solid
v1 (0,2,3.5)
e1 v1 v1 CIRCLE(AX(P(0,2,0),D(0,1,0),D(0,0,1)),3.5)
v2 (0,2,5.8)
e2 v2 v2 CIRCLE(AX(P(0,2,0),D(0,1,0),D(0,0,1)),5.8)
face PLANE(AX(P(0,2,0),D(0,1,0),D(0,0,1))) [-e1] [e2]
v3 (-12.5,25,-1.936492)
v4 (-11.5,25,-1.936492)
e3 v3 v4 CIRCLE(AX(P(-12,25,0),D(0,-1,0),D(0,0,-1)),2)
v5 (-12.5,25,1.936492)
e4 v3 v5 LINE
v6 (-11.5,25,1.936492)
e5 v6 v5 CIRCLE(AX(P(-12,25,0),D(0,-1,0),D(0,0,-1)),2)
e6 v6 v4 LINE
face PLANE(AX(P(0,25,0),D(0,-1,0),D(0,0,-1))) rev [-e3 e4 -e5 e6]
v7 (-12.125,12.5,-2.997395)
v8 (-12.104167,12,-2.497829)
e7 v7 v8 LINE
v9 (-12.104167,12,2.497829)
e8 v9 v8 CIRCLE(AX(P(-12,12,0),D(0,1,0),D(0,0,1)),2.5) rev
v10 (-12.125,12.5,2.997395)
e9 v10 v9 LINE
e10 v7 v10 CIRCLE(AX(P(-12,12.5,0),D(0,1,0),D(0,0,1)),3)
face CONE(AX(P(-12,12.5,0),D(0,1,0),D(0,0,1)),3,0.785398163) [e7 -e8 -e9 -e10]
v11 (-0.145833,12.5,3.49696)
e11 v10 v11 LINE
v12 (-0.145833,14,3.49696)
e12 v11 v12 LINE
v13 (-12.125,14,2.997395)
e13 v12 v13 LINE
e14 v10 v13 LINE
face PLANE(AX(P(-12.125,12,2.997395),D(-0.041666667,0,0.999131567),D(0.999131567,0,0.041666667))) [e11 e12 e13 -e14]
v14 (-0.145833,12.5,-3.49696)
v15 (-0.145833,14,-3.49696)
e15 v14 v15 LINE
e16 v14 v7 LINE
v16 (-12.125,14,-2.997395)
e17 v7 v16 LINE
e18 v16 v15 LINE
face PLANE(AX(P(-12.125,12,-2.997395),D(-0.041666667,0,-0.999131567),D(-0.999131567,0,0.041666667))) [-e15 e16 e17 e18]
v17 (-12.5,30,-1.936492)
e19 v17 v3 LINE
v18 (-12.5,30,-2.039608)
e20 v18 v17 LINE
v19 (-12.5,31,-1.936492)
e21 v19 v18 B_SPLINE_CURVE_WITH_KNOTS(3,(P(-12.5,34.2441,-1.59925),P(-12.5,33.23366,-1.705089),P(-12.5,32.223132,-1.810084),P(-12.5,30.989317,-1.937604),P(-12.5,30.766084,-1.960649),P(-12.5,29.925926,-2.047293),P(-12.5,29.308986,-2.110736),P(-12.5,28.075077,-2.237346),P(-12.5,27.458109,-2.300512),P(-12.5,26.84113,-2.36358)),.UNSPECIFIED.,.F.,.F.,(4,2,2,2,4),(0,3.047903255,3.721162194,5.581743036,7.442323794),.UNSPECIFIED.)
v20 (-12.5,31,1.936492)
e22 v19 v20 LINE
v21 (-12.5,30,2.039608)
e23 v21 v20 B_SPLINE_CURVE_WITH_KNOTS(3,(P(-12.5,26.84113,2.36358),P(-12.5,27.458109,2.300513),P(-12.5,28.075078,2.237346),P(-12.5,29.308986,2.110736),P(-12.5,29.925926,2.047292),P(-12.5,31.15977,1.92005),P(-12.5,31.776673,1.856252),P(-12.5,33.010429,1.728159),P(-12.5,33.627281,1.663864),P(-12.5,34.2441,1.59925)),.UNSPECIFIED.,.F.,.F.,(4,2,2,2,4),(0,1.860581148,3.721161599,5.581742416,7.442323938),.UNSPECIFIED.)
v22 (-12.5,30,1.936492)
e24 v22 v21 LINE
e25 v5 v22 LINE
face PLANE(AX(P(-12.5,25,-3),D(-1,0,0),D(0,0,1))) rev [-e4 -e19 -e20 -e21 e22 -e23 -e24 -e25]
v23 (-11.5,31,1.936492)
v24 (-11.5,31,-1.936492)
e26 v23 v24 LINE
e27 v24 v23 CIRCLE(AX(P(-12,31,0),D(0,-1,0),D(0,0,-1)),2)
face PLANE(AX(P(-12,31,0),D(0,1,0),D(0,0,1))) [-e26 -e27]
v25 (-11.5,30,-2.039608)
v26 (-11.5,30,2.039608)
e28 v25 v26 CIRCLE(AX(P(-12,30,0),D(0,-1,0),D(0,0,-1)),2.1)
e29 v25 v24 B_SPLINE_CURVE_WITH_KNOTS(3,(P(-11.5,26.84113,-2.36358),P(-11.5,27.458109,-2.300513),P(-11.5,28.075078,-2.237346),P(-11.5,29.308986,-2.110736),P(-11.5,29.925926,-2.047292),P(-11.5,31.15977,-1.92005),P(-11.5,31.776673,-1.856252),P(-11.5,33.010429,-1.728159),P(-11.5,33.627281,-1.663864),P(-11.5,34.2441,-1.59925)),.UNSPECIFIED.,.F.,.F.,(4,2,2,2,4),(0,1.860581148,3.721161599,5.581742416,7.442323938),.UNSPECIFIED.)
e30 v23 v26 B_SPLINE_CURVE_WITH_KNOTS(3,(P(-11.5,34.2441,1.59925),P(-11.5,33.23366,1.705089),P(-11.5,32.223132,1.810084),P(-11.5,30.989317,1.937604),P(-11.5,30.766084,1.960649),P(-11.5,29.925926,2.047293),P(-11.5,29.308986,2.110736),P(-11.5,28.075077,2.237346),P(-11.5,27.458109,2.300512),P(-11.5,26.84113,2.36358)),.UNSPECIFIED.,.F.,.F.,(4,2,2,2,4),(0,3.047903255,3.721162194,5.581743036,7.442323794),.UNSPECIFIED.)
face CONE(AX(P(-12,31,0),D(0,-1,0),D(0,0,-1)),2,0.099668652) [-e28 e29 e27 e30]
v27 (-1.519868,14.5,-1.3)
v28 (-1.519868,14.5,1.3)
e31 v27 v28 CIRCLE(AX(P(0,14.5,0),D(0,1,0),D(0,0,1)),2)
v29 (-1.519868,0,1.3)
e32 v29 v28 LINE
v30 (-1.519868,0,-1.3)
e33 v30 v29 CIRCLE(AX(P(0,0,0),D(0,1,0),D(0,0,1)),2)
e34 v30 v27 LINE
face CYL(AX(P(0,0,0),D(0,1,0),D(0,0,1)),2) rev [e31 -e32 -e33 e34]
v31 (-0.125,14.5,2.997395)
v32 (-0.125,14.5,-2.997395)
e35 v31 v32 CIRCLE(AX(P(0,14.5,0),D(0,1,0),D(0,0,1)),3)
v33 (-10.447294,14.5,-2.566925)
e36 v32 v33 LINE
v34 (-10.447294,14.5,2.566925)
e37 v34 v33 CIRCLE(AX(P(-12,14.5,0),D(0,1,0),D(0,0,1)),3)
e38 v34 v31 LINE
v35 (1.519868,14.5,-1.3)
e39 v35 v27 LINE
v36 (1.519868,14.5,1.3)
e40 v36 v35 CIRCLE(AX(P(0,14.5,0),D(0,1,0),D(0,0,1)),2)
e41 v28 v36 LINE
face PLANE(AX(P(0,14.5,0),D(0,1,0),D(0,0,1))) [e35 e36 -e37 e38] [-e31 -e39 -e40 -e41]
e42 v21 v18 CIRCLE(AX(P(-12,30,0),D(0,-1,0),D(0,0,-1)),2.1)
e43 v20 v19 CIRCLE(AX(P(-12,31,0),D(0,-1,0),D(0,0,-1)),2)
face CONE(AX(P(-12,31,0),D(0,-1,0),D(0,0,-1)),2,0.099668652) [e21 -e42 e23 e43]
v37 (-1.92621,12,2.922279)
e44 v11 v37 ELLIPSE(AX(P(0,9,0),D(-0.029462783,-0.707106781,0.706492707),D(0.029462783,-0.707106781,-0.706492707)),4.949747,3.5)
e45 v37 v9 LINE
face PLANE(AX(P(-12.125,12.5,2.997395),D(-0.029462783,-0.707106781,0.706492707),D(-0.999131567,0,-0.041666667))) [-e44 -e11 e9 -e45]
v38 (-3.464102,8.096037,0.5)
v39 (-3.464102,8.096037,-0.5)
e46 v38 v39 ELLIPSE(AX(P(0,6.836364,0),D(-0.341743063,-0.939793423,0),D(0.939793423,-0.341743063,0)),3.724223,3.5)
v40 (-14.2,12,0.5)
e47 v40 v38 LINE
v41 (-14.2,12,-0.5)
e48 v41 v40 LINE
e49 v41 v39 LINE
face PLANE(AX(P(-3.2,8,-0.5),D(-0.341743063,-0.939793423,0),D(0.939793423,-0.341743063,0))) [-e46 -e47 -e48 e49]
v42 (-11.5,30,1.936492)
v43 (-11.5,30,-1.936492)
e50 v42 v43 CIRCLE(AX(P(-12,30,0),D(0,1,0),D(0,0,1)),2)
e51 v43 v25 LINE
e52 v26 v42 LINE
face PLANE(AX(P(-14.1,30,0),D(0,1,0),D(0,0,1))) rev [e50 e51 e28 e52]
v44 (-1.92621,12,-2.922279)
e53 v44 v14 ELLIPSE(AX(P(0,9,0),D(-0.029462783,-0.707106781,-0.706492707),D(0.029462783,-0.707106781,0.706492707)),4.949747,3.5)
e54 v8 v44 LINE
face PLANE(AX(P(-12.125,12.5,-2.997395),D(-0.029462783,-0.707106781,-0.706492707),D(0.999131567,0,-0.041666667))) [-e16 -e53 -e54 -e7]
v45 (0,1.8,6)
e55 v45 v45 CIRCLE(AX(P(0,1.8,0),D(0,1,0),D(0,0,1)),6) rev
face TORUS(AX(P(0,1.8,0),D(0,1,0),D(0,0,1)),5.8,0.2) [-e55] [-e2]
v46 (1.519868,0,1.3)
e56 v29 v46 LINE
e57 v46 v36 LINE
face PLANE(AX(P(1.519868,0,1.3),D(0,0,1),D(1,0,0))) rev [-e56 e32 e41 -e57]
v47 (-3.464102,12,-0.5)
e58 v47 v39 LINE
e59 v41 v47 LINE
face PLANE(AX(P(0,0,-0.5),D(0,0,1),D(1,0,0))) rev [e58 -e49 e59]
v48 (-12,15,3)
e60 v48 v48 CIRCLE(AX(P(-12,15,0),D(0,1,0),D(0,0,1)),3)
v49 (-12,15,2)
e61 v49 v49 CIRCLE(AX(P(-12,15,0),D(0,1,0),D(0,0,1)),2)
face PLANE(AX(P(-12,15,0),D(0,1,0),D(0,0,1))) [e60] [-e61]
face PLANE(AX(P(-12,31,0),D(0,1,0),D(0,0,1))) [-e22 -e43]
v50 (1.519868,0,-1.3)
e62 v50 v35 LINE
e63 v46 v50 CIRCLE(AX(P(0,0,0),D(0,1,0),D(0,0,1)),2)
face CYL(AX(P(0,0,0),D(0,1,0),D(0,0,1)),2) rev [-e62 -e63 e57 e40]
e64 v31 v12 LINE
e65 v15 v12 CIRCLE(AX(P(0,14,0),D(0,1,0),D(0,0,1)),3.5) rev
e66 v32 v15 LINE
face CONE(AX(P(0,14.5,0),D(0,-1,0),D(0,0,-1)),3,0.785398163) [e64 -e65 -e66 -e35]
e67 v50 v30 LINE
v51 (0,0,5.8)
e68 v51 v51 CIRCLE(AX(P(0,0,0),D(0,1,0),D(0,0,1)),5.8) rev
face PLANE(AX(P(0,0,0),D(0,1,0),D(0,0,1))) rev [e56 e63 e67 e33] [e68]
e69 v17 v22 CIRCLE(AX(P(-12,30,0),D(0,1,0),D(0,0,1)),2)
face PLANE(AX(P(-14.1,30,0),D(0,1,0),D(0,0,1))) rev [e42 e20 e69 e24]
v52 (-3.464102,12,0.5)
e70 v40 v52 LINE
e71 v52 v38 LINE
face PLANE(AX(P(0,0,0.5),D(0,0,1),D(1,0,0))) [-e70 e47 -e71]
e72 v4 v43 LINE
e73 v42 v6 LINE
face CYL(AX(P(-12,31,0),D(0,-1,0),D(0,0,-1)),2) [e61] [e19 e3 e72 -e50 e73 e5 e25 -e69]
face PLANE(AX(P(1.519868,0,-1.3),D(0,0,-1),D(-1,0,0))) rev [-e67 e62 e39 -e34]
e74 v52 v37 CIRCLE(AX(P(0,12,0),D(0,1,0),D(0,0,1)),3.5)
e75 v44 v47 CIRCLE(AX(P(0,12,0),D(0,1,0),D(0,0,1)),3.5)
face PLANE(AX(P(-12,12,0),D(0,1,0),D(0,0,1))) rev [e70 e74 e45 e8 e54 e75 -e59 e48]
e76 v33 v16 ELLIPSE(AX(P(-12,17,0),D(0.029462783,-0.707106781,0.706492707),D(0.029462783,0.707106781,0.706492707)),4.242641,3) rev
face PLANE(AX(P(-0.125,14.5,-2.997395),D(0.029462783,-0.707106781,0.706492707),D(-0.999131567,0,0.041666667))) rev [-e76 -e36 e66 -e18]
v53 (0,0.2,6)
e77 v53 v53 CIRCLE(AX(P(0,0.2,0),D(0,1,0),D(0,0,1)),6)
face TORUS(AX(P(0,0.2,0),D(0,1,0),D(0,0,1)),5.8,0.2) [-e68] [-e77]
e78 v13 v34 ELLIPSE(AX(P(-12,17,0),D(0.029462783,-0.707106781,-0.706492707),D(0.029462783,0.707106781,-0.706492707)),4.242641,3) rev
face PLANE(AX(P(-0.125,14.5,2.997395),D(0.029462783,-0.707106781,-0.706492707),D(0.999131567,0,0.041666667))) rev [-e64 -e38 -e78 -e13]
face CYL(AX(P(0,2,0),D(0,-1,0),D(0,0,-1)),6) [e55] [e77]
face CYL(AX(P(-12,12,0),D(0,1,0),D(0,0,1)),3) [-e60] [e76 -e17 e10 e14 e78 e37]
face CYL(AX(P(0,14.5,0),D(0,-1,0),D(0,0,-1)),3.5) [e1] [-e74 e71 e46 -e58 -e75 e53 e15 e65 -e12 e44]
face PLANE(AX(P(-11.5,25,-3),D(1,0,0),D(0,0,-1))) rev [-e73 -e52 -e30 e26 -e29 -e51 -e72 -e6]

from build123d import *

# Parameters (mm, degrees)
SKETCH_1_R           = 6
EXTRUDE_1_DEPTH      = 2
SKETCH_2_R           = 3.5
EXTRUDE_2_DEPTH      = 12.5
EXTRUDE_START        = -2.5
EXTRUDE_3_DEPTH      = 2.5
EXTRUDE_4_DEPTH      = 0.5
EXTRUDE_4_DEPTH_BACK = 0.5
SKETCH_5_R           = 3
EXTRUDE_5_DEPTH      = 0.5
SKETCH_6_R           = 2
EXTRUDE_6_DEPTH      = 16
SKETCH_8_W           = 1
SKETCH_8_H           = 6
CUT_EXTRUDE_1_DEPTH  = 6
CUT_EXTRUDE_2_DEPTH  = 24.092206478
FILLET_1_R           = 0.2
CHAMFER_1_SIZE       = 0.5


with BuildPart() as part:
    # 草图1 → 凸台-拉伸1 (new body)
    with BuildSketch(Plane(origin=(0, 0, 0), x_dir=(1, 0, 0), z_dir=(0, 1, 0))):
        with Locations(Location((0, 0, 0), (0, 0, 270))):
            Circle(SKETCH_1_R)
    extrude(amount=EXTRUDE_1_DEPTH)

    # 草图2 → 凸台-拉伸2 (add)
    with BuildSketch(Plane(origin=(0, 2, 0), x_dir=(1, 0, 0), z_dir=(0, 1, 0))):
        with Locations(Location((0, 0, 0), (0, 0, 270))):
            Circle(SKETCH_2_R)
    extrude(amount=EXTRUDE_2_DEPTH)

    # 草图3 → 凸台-拉伸3 (add)
    with BuildSketch(Plane(origin=(0, 14.5, 0), x_dir=(1, 0, 0), z_dir=(0, 1, 0)).offset(EXTRUDE_START)):
        with BuildLine():
            Line((-12.125, 2.997394702), (-0.145833333, 3.496960486))
            ThreePointArc((-0.145833333, 3.496960486), (3.5, 0), (-0.145833333, -3.496960486))
            Line((-0.145833333, -3.496960486), (-12.125, -2.997394702))
            ThreePointArc((-12.125, -2.997394702), (-15, 0), (-12.125, 2.997394702))
        make_face()
    extrude(amount=EXTRUDE_3_DEPTH)

    # 草图4 → 凸台-拉伸4 (add, two sides: drawn at the far end of the back side and taken through both)
    with BuildSketch(Plane.XY.offset(-EXTRUDE_4_DEPTH_BACK)):
        Polygon((-14.2, 12), (-3.2, 8), (-0.2, 6.909090909), (-0.2, 12), (-3.2, 12), align=None)
    extrude(amount=EXTRUDE_4_DEPTH + EXTRUDE_4_DEPTH_BACK)

    # 草图5 → 凸台-拉伸5 (add)
    with BuildSketch(Plane(origin=(0, 14.5, 0), x_dir=(1, 0, 0), z_dir=(0, 1, 0))):
        with Locations(Location((-12, 0, 0), (0, 0, 270))):
            Circle(SKETCH_5_R)
    extrude(amount=EXTRUDE_5_DEPTH)

    # 草图6 → 凸台-拉伸6 (add)
    with BuildSketch(Plane(origin=(0, 15, 0), x_dir=(1, 0, 0), z_dir=(0, 1, 0))):
        with Locations(Location((-12, 0, 0), (0, 0, 270))):
            Circle(SKETCH_6_R)
    extrude(amount=EXTRUDE_6_DEPTH)

    # 草图7 → 旋转1 (revolve)
    with BuildSketch(Plane.XY, mode=Mode.PRIVATE) as revolve_1_sk:
        Polygon((-12, 31), (-14, 31), (-14.1, 30), (-12, 30), align=None)
    revolve(revolve_1_sk.sketch.rotate(Axis((-12, 30, 0), (0, 1, 0)), 90), axis=Axis((-12, 30, 0), (0, 1, 0)))

    # 草图8 → 切除-拉伸1 (cut)
    with BuildSketch(Plane(origin=(0, 31, 0), x_dir=(1, 0, 0), z_dir=(0, 1, 0))):
        with Locations((-12, 0)):
            Rectangle(SKETCH_8_W, SKETCH_8_H)
    extrude(amount=-CUT_EXTRUDE_1_DEPTH, mode=Mode.SUBTRACT)

    # 草图9 → 切除-拉伸2 (cut, through all)
    with BuildSketch(Plane(origin=(0, 14.5, 0), x_dir=(1, 0, 0), z_dir=(0, 1, 0))):
        with BuildLine():
            Line((1.519868415, -1.3), (-1.519868415, -1.3))
            ThreePointArc((-1.519868415, -1.3), (-2, 0), (-1.519868415, 1.3))
            Line((-1.519868415, 1.3), (1.519868415, 1.3))
            ThreePointArc((1.519868415, 1.3), (2, 0), (1.519868415, -1.3))
        make_face()
    extrude(amount=-CUT_EXTRUDE_2_DEPTH, mode=Mode.SUBTRACT)

    # 圆角1
    fillet_1_edges = [part.edges().sort_by_distance(p)[0] for p in [
        (0, 0, -6),
        (0, 2, -6),
    ]]
    fillet(fillet_1_edges, radius=FILLET_1_R)

    # 倒角1
    # the kernel refuses this chamfer: 0.5 mm, written as the material it takes off along each edge
    with BuildSketch(Plane(origin=(1.138891494, 12, 3.550537215), x_dir=(-0.0011456615254410918, 0.9996219169112968, 0.02747199829378469), z_dir=(-0.9991315673568166, 0, -0.041666666666666574))) as chamfer_1_piece_1_section:
        Polygon((CHAMFER_1_SIZE * 0.999621916911, CHAMFER_1_SIZE * 0.0274958766106), (-CHAMFER_1_SIZE * 0.0274958766106, CHAMFER_1_SIZE * 0.999621916911), (0, 0), align=None)
    chamfer_1_piece_1 = extrude(amount=13.275420302, mode=Mode.PRIVATE)
    chamfer_1_piece_1 = chamfer_1_piece_1 - Plane(origin=(0, 12.171019003, 0), x_dir=(0, 0, 1), z_dir=(0, -1, 0)) * Cylinder(3.5, 29, mode=Mode.PRIVATE)
    add(chamfer_1_piece_1, mode=Mode.SUBTRACT)
    with BuildSketch(Plane(origin=(-12, 12, 0), x_dir=(-0.041666666666666664, 0, 0.9991315673568165), z_dir=(0.9991315673568165, 0, 0.041666666666666664))) as chamfer_1_piece_2:
        Polygon((3 - CHAMFER_1_SIZE, 0), (3, -CHAMFER_1_SIZE), (3, 0), align=None)
    revolve(axis=Axis((-12, 12, 0), (0, -1, 0)), revolution_arc=175.223969073, mode=Mode.SUBTRACT)
    with BuildSketch(Plane(origin=(-12.125, 12, -2.997394702), x_dir=(0.04165091320463745, -0.027495876610585623, 0.9987538126078094), z_dir=(0.9991315673568165, 0, -0.041666666666666755))) as chamfer_1_piece_3_section:
        Polygon((CHAMFER_1_SIZE * 0.999621916911, -CHAMFER_1_SIZE * 0.0274958766106), (-CHAMFER_1_SIZE * 0.0274958766106, -CHAMFER_1_SIZE * 0.999621916911), (0, 0), align=None)
    chamfer_1_piece_3 = extrude(amount=13.275420302, mode=Mode.PRIVATE)
    chamfer_1_piece_3 = chamfer_1_piece_3 - Plane(origin=(0, 12.143445787, 0), x_dir=(0, 0, 1), z_dir=(0, -1, 0)) * Cylinder(3.5, 29, mode=Mode.PRIVATE)
    add(chamfer_1_piece_3, mode=Mode.SUBTRACT)
    with BuildSketch(Plane(origin=(-13.409724827, 14.5, -2.943817973), x_dir=(0.04165091320463745, 0.027495876610585623, 0.9987538126078094), z_dir=(0.9991315673568165, 0, -0.041666666666666755))) as chamfer_1_piece_4_section:
        Polygon((CHAMFER_1_SIZE * 0.999621916911, CHAMFER_1_SIZE * 0.0274958766106), (-CHAMFER_1_SIZE * 0.0274958766106, CHAMFER_1_SIZE * 0.999621916911), (0, 0), align=None)
    chamfer_1_piece_4 = extrude(amount=13.275420302, mode=Mode.PRIVATE)
    chamfer_1_piece_4 = chamfer_1_piece_4 - Plane(origin=(-12, 14.328980995, 0), x_dir=(0, 0, 1), z_dir=(0, -1, 0)) * Cylinder(3, 29, mode=Mode.PRIVATE)
    add(chamfer_1_piece_4, mode=Mode.SUBTRACT)
    with BuildSketch(Plane(origin=(0, 14.5, 0), x_dir=(0, 0, 1), z_dir=(-1, 0, 0))) as chamfer_1_piece_5:
        Polygon((3.5, -CHAMFER_1_SIZE), (3.5 - CHAMFER_1_SIZE, 0), (3.5, 0), align=None)
    revolve(axis=Axis((0, 14.5, 0), (0, 1, 0)), revolution_arc=182.388015463, mode=Mode.SUBTRACT)
    with BuildSketch(Plane(origin=(-0.145833333, 14.5, 3.496960486), x_dir=(0.04165091320463727, 0.027495876610585623, -0.9987538126078094), z_dir=(-0.9991315673568166, 0, -0.041666666666666574))) as chamfer_1_piece_6_section:
        Polygon((CHAMFER_1_SIZE * 0.999621916911, CHAMFER_1_SIZE * 0.0274958766106), (-CHAMFER_1_SIZE * 0.0274958766106, CHAMFER_1_SIZE * 0.999621916911), (0, 0), align=None)
    chamfer_1_piece_6 = extrude(amount=13.275420302, mode=Mode.PRIVATE)
    chamfer_1_piece_6 = chamfer_1_piece_6 - Plane(origin=(-12, 14.356641066, 0), x_dir=(0, 0, 1), z_dir=(0, -1, 0)) * Cylinder(3, 29, mode=Mode.PRIVATE)
    add(chamfer_1_piece_6, mode=Mode.SUBTRACT)
    with BuildSketch(Plane(origin=(0, 14.5, 0), x_dir=(-0.04166666666666704, 0, 0.9991315673568166), z_dir=(-0.9991315673568166, 0, -0.04166666666666704))) as chamfer_1_piece_7:
        Polygon((3.5, -CHAMFER_1_SIZE), (3.5 - CHAMFER_1_SIZE, 0), (3.5, 0), align=None)
    revolve(axis=Axis((0, 14.5, 0), (0, 1, 0)), revolution_arc=2.388015463, mode=Mode.SUBTRACT)


solid = part.part
